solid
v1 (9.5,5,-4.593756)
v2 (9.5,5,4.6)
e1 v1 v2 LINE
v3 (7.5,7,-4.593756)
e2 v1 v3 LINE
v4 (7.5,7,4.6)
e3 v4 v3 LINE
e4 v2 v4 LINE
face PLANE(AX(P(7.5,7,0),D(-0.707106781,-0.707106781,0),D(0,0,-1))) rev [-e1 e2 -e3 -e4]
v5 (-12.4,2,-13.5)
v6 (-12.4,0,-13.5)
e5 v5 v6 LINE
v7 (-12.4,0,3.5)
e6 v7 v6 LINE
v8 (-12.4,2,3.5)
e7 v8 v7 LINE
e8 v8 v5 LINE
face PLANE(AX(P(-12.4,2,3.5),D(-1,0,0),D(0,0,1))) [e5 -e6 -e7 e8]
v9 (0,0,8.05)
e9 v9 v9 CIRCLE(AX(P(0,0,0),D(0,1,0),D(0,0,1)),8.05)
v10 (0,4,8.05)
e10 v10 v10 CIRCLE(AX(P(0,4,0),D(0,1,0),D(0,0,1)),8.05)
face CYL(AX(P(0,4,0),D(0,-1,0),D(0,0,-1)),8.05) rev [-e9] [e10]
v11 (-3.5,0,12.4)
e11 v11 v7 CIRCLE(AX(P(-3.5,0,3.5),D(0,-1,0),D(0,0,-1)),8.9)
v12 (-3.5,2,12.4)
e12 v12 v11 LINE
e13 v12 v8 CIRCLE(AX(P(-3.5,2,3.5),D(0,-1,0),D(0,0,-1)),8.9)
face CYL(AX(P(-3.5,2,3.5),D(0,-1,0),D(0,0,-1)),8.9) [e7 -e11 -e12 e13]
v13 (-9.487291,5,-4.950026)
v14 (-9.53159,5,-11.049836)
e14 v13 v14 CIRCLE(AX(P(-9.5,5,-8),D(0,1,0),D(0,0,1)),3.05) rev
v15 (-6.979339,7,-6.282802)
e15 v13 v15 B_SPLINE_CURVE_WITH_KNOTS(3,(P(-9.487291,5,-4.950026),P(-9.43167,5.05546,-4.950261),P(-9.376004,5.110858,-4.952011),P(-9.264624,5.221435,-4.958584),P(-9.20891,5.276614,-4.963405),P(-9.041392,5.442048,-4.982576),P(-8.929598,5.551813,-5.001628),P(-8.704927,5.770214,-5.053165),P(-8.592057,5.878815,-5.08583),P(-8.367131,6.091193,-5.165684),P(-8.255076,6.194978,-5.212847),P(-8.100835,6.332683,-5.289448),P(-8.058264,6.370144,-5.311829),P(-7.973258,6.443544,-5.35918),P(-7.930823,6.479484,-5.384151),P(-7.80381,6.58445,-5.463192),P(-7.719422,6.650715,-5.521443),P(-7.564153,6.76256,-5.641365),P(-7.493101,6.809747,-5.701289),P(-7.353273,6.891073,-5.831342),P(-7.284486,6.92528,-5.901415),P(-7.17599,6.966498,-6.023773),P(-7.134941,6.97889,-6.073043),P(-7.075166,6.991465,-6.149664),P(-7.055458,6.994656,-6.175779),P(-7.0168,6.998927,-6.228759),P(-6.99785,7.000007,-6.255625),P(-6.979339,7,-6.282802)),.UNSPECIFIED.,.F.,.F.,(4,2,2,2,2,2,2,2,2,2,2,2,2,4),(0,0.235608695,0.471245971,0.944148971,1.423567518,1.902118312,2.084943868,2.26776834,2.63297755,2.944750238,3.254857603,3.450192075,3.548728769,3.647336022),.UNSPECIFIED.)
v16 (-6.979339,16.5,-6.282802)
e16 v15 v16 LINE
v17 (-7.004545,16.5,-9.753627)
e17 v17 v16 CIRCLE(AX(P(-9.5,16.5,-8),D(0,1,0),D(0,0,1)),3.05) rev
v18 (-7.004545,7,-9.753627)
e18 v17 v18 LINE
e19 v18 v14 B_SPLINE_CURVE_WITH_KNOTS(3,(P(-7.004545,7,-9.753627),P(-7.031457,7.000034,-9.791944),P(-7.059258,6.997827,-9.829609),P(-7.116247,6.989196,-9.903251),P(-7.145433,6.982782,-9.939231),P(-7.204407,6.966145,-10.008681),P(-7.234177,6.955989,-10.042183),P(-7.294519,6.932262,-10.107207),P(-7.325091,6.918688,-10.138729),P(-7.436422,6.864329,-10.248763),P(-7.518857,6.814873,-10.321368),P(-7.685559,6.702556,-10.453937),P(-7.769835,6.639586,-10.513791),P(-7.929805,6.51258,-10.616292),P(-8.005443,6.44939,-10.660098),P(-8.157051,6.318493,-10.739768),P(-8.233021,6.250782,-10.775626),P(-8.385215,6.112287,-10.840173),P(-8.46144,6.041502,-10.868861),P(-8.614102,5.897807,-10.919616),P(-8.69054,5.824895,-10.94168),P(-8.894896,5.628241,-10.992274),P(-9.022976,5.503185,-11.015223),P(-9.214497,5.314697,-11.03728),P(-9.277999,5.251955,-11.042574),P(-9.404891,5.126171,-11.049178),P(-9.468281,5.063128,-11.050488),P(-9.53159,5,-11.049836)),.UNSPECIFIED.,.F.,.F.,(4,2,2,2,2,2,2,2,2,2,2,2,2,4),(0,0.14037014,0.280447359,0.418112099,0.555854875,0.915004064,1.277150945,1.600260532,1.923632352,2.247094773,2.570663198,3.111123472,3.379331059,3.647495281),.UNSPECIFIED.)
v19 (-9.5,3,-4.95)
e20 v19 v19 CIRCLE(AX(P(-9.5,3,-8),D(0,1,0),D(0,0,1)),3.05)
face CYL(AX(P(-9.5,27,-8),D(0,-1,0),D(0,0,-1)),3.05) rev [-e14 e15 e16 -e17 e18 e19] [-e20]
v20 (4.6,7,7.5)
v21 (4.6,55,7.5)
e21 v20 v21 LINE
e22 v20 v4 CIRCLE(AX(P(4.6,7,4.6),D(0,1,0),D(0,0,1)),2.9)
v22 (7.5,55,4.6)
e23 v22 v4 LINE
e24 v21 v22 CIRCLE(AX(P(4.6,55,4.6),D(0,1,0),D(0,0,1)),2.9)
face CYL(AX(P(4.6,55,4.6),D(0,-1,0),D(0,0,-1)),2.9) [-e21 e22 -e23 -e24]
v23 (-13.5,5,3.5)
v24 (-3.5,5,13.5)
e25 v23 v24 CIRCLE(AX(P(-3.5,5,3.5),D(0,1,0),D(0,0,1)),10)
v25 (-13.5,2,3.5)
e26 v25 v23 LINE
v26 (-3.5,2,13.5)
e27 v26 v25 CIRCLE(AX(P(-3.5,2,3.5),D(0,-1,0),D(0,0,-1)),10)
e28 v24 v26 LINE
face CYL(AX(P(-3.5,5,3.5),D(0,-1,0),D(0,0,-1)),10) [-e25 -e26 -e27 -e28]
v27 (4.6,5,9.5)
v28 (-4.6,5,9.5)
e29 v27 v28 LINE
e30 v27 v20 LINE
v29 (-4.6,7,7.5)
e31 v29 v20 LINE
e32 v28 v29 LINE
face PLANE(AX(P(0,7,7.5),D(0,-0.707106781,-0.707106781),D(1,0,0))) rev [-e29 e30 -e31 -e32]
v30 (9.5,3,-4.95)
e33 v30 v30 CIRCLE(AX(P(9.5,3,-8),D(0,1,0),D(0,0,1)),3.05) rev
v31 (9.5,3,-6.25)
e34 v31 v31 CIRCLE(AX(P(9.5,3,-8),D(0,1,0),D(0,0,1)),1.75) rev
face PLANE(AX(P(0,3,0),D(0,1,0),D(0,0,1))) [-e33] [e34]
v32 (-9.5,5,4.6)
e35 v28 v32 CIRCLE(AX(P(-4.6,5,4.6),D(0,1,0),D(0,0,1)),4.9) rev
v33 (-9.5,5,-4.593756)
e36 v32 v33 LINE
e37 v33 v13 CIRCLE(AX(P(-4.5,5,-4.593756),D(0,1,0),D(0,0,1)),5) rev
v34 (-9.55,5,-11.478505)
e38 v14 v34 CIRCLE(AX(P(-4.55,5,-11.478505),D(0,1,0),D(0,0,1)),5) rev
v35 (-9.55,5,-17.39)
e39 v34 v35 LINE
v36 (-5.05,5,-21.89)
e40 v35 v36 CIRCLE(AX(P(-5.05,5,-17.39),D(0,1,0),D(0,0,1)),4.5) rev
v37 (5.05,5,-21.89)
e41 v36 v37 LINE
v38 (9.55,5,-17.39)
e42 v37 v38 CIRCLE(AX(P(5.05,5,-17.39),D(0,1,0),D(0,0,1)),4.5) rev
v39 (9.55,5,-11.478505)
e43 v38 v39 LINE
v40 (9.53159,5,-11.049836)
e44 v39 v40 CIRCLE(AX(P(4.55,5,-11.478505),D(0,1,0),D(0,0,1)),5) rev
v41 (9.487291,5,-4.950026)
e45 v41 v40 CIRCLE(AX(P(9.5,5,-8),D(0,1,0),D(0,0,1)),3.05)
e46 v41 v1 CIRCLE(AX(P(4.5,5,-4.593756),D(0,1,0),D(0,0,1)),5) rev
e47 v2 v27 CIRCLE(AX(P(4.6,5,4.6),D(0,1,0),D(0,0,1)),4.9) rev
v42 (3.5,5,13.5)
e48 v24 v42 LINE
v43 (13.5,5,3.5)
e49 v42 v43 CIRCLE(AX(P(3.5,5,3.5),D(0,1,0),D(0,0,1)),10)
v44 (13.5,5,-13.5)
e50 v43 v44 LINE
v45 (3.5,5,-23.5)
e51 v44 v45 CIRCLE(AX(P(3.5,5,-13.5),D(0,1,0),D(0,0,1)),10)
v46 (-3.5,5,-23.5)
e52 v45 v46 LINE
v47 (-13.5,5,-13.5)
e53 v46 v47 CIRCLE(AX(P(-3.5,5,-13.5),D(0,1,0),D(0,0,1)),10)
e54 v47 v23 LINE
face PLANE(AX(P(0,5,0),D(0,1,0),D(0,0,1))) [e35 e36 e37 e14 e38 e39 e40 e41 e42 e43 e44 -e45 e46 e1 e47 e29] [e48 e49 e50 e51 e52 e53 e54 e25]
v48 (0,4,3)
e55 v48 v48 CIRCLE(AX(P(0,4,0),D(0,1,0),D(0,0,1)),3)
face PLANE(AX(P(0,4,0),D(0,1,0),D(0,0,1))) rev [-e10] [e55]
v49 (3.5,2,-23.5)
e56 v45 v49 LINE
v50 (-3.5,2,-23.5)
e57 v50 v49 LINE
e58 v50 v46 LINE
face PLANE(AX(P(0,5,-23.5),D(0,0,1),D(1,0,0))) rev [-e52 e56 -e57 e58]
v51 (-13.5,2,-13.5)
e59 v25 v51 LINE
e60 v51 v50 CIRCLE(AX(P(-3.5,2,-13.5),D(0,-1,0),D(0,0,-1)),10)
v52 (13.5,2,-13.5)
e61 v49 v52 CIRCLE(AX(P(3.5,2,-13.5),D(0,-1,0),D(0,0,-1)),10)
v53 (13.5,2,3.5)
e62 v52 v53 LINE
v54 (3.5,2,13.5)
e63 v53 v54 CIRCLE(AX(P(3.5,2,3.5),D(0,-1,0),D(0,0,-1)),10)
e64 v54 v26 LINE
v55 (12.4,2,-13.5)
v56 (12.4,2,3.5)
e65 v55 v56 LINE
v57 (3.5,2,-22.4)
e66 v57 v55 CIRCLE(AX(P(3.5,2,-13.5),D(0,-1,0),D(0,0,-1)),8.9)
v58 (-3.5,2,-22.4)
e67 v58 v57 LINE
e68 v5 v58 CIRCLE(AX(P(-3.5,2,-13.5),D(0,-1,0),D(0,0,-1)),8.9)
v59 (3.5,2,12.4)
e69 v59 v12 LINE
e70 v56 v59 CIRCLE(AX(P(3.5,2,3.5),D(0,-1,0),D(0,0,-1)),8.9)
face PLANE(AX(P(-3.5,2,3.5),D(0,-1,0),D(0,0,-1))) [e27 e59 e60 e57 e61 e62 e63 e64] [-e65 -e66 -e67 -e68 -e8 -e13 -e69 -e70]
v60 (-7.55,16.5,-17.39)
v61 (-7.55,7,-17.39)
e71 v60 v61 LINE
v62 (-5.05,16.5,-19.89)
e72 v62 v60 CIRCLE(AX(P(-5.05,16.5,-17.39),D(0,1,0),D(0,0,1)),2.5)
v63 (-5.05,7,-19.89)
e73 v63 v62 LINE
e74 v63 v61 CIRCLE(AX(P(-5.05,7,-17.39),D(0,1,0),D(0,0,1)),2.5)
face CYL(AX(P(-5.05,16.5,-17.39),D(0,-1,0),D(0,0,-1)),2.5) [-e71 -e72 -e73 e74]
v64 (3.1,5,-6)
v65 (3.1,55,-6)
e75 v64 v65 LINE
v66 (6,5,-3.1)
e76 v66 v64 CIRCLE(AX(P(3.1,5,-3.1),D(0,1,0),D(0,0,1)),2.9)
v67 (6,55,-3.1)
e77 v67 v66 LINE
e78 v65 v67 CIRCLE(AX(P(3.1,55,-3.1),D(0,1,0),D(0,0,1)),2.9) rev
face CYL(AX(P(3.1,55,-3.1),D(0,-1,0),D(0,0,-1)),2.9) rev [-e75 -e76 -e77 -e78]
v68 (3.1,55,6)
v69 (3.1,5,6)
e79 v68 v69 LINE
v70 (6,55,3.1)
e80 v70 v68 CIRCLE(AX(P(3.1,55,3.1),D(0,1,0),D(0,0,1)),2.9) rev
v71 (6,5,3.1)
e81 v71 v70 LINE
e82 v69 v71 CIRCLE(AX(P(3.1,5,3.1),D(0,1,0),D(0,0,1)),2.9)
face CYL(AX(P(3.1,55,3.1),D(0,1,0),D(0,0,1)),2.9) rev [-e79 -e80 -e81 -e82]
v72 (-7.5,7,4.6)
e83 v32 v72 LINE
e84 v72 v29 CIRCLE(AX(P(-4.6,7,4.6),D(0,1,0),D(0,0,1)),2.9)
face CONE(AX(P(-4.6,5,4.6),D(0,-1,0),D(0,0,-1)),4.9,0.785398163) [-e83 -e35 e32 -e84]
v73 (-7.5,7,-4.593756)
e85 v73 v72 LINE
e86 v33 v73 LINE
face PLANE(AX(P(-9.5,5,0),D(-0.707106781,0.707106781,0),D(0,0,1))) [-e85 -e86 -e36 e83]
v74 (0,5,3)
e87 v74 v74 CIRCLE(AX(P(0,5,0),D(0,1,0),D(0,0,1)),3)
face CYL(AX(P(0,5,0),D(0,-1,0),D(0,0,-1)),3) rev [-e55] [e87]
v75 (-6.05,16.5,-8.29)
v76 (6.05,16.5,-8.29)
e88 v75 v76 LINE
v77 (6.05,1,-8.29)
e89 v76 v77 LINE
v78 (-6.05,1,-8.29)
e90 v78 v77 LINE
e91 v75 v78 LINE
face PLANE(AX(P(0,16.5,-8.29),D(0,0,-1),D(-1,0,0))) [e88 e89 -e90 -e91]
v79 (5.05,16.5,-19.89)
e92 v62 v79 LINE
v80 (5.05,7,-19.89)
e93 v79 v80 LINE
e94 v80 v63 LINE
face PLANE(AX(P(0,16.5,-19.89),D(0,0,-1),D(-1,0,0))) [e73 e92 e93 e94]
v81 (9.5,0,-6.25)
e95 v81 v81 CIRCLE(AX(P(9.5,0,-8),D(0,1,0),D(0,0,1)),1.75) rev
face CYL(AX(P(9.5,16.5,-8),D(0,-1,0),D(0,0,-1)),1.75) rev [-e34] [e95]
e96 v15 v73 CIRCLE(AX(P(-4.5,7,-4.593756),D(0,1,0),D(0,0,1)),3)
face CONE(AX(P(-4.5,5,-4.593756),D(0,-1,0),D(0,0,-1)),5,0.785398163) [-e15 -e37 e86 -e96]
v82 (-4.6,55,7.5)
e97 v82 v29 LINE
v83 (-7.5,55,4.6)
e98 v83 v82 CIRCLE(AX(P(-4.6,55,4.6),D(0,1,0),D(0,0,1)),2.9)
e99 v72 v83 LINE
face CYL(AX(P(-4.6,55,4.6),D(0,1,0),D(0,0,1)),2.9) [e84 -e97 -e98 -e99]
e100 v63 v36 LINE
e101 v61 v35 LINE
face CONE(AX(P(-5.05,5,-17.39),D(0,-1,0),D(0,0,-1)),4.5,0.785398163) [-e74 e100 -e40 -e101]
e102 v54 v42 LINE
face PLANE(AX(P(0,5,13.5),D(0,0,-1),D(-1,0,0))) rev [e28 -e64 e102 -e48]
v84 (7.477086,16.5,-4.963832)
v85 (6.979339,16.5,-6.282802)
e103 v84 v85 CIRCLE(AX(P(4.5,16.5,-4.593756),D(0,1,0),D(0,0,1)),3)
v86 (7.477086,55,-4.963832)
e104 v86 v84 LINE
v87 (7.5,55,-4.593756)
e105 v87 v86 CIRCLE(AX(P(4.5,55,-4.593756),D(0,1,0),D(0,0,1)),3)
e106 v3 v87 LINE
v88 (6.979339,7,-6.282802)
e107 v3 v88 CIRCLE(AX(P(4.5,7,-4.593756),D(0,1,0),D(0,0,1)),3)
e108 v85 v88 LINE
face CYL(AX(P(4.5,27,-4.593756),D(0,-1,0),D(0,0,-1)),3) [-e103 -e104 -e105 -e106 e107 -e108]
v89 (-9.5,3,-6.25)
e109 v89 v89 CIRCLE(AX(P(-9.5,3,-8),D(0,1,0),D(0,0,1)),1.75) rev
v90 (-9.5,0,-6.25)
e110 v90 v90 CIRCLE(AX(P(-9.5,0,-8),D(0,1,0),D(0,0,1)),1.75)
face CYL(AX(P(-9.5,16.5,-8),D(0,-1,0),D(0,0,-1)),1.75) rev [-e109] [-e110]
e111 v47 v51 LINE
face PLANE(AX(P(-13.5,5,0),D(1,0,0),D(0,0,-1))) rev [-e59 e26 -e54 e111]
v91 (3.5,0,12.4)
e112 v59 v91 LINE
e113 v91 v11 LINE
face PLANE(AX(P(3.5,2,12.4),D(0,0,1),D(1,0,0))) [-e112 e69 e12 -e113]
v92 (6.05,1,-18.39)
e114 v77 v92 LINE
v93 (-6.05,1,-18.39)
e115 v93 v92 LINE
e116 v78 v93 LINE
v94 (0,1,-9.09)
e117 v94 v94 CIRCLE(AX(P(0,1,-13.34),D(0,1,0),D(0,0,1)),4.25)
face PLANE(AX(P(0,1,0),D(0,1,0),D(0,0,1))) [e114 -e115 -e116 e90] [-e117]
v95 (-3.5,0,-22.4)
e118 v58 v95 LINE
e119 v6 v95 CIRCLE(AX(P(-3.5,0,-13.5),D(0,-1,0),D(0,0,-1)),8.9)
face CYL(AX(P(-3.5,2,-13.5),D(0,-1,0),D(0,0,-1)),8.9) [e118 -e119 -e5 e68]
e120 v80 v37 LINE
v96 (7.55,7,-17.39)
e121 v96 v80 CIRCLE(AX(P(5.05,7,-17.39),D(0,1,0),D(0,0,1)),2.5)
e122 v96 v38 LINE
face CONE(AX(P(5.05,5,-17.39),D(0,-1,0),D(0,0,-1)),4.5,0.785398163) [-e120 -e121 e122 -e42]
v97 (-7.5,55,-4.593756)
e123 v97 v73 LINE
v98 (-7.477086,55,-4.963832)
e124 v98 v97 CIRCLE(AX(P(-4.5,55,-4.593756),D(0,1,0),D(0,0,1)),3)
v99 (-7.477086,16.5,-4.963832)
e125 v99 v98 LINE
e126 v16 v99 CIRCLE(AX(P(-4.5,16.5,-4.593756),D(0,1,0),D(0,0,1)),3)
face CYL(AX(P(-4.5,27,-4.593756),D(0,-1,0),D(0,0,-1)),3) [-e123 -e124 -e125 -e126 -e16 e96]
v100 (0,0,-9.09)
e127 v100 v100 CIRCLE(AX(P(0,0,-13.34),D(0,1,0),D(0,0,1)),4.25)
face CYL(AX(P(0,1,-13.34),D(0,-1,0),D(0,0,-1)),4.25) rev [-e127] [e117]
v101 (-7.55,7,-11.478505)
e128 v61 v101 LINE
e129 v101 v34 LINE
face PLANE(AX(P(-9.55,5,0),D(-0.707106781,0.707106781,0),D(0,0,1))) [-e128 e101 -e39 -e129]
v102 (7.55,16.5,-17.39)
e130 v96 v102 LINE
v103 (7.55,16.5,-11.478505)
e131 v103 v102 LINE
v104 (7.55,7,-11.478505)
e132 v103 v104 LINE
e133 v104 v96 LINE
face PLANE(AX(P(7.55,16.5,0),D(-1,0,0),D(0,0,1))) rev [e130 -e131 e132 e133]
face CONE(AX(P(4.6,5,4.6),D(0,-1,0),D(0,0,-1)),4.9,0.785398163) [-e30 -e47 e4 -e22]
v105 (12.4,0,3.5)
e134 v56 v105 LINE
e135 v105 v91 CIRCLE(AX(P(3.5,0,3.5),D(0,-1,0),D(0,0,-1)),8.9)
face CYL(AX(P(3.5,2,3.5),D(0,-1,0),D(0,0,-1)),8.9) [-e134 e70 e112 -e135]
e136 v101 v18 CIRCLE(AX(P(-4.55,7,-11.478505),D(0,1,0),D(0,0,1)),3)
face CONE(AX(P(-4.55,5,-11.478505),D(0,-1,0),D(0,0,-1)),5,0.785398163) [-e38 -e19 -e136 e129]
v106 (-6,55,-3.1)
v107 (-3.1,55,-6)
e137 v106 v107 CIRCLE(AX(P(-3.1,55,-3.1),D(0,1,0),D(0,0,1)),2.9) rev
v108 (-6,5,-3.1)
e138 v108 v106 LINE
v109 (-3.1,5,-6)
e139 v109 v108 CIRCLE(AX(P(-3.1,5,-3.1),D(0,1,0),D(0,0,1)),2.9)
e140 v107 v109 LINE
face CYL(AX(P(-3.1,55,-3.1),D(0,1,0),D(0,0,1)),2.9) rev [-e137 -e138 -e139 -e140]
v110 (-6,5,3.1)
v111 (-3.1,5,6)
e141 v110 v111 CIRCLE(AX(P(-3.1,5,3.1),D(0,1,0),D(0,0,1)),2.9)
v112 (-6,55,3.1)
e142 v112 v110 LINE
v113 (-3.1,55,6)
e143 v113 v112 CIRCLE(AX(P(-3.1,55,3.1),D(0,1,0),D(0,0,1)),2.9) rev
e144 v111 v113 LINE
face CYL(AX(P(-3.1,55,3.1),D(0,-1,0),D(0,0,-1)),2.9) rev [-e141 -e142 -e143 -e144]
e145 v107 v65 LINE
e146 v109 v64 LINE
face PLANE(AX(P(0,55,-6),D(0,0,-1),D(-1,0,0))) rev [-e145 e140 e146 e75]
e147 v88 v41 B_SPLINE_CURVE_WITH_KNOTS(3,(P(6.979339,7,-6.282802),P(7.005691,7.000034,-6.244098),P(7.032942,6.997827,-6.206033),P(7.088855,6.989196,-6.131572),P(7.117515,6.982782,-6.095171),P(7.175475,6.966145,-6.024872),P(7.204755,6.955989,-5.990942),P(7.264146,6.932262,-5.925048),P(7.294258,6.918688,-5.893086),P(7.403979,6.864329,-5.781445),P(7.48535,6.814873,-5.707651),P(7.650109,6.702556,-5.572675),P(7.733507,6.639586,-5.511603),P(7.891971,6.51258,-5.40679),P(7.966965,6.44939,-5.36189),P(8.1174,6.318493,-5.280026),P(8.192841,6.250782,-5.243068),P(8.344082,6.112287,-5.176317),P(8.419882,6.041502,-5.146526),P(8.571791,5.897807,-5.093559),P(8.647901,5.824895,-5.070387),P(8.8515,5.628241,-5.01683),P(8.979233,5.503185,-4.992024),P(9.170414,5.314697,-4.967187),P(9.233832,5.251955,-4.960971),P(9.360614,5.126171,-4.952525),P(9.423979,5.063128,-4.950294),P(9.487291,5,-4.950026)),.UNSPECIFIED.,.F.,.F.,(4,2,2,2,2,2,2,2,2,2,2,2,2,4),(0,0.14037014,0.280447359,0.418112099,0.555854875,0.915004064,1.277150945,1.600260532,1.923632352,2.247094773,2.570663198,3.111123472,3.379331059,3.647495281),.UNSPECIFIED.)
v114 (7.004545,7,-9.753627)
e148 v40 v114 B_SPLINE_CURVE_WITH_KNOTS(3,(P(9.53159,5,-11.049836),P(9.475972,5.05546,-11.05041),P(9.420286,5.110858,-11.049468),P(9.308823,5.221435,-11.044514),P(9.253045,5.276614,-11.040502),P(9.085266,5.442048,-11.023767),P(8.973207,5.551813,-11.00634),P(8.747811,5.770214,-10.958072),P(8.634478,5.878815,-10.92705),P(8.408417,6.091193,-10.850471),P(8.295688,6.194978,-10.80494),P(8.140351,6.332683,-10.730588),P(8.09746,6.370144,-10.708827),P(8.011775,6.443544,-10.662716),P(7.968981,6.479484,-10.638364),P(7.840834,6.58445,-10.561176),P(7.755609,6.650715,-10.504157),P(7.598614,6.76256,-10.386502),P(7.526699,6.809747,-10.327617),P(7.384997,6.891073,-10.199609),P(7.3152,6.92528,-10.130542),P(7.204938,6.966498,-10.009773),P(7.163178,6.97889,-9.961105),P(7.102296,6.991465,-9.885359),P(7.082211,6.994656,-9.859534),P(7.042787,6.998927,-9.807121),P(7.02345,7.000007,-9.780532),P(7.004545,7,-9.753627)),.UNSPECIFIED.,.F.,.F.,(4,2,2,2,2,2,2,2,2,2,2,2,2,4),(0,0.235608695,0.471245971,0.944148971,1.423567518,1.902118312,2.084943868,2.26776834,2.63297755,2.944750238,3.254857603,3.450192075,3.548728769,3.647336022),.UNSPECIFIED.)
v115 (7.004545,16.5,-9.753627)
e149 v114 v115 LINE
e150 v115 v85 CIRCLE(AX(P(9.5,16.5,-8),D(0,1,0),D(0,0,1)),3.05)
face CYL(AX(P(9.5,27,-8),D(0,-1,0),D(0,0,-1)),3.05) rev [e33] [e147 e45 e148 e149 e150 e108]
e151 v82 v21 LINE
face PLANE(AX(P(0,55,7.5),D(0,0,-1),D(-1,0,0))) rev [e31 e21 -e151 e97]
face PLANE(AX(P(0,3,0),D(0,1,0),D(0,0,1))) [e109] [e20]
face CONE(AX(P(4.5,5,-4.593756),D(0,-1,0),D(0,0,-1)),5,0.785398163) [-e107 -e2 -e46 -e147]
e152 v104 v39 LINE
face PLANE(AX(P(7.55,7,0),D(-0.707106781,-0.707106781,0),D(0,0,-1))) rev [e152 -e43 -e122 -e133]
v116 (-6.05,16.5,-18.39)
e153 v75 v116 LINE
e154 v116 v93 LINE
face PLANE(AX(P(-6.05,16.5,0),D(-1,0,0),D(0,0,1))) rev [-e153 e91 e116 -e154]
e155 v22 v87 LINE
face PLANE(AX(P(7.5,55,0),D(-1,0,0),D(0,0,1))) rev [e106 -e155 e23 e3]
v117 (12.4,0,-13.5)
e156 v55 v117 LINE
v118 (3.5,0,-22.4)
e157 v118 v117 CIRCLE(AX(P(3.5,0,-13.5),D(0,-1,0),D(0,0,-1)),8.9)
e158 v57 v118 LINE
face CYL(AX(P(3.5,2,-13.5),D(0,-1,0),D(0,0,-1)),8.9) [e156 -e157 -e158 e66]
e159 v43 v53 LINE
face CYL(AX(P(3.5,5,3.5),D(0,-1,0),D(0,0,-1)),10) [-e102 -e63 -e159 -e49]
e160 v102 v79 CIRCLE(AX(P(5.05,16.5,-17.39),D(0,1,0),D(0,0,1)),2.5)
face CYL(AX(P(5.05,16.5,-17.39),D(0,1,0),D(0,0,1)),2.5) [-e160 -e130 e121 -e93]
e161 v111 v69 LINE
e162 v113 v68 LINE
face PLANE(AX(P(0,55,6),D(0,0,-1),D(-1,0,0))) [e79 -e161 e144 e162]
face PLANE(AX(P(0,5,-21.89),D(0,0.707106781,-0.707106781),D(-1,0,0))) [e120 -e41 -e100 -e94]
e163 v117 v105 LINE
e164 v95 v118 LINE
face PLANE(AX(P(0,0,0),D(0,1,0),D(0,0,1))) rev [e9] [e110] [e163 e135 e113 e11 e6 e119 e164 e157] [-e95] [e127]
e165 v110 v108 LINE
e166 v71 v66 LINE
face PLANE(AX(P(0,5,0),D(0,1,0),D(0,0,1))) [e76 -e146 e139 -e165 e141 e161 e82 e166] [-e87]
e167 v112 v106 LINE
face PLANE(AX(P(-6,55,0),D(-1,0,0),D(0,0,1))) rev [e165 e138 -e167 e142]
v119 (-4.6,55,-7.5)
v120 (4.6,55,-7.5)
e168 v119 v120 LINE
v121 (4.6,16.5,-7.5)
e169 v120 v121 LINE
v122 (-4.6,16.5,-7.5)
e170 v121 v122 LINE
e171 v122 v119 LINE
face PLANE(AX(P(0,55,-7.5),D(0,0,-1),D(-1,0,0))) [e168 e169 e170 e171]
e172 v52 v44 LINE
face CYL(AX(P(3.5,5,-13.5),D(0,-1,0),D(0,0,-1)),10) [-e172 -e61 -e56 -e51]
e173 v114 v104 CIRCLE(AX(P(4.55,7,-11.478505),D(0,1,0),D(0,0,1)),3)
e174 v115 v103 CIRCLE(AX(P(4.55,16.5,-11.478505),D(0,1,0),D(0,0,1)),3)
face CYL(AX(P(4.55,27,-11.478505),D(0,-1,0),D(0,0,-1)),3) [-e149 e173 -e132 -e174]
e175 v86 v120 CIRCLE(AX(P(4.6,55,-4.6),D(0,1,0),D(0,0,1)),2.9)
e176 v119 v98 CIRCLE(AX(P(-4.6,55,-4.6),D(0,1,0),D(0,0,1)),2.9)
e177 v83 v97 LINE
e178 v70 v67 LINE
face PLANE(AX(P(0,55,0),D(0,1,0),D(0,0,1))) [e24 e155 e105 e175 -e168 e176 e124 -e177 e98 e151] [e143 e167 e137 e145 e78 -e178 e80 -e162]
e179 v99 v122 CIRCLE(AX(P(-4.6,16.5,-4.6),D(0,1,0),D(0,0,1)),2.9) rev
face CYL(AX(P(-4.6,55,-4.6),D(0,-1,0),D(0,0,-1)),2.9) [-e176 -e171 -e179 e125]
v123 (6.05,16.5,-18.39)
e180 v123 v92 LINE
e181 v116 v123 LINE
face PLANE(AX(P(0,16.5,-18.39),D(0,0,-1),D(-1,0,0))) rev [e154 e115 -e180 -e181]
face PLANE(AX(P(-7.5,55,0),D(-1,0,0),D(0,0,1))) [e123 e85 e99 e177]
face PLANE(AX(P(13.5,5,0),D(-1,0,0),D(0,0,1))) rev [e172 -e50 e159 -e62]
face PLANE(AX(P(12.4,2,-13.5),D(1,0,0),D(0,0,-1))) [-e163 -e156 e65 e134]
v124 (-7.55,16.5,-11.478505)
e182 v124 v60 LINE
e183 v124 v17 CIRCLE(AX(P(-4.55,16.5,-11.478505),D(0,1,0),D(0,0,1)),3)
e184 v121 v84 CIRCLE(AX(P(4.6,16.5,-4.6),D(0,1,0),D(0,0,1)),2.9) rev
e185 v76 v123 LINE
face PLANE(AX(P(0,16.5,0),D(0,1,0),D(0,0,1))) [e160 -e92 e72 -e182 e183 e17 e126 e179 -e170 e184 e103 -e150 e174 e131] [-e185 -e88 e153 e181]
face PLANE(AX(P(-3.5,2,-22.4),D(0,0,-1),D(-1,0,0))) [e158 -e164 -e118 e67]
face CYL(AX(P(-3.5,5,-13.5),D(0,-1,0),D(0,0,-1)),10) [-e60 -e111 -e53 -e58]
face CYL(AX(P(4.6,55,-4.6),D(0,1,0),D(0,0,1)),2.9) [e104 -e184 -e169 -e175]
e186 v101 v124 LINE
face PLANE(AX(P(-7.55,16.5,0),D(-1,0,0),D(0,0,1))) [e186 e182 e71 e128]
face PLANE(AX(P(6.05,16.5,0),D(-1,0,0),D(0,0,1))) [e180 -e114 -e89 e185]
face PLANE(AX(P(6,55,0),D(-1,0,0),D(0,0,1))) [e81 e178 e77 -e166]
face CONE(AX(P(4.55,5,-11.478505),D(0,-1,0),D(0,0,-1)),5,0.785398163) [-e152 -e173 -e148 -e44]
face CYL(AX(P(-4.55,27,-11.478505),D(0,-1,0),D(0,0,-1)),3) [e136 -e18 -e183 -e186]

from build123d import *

# Parameters (mm, degrees)
SKETCH2_W               = 27
SKETCH2_H               = 37
SKETCH2_R               = 3
SKETCH2_W_2             = 15.1
SKETCH2_H_2             = 13.1
BOSS_EXTRUDE1_DEPTH     = 5
SKETCH2_7_W             = 15.1
SKETCH2_7_H             = 13.1
SKETCH2_7_W_2           = 12.1
SKETCH2_7_H_2           = 10.1
BOSS_EXTRUDE2_DEPTH     = 16.5
SKETCH2_8_W             = 12.1
SKETCH2_8_H             = 10.1
SKETCH2_8_R             = 4.25
BOSS_EXTRUDE3_DEPTH     = 1
SKETCH2_12_R            = 8.05
CUT_EXTRUDE3_DEPTH      = 4
SKETCH2_11_R            = 1.75
CUT_EXTRUDE2_DEPTH      = 32.729323976
FILLET1_R               = 10
CUT_EXTRUDE1_START      = -2
CUT_EXTRUDE1_DEPTH      = 2
SKETCH4_W               = 15
SKETCH4_H               = 15
SKETCH4_W_2             = 12
SKETCH4_H_2             = 12
BOSS_EXTRUDE8_DEPTH     = 50
FILLET4_R               = 2.5
CUT_EXTRUDE4_DEPTH      = 22
CUT_EXTRUDE4_DEPTH_BACK = 2
SKETCH4_3_R             = 1.75
FILLET3_START           = 16.5
FILLET3_DEPTH           = 38.5
FILLET3_START_2         = 5
FILLET3_2_DEPTH         = 11.898030769
FILLET5_R               = 3
CHAMFER1_SIZE           = 2
FILLET6_R               = 2.9


with BuildPart() as part:
    # Sketch2 → Boss-Extrude1 (new body)
    with BuildSketch(Plane(origin=(0, 0, 0), x_dir=(1, 0, 0), z_dir=(0, 1, 0))):
        with Locations((0, 5)):
            Rectangle(SKETCH2_W, SKETCH2_H)
        with Locations(Location((0, 0, 0), (0, 0, 270))):
            Circle(SKETCH2_R, mode=Mode.SUBTRACT)
        with Locations((0, 13.34)):
            Rectangle(SKETCH2_W_2, SKETCH2_H_2, mode=Mode.SUBTRACT)
    extrude(amount=BOSS_EXTRUDE1_DEPTH)

    # Sketch2<7> → Boss-Extrude2 (add)
    with BuildSketch(Plane(origin=(0, 0, 0), x_dir=(1, 0, 0), z_dir=(0, 1, 0))):
        with Locations((0, 13.34)):
            Rectangle(SKETCH2_7_W, SKETCH2_7_H)
        with Locations((0, 13.34)):
            Rectangle(SKETCH2_7_W_2, SKETCH2_7_H_2, mode=Mode.SUBTRACT)
    extrude(amount=BOSS_EXTRUDE2_DEPTH)

    # Sketch2<8> → Boss-Extrude3 (add)
    with BuildSketch(Plane(origin=(0, 0, 0), x_dir=(1, 0, 0), z_dir=(0, 1, 0))):
        with Locations((0, 13.34)):
            Rectangle(SKETCH2_8_W, SKETCH2_8_H)
        with Locations(Location((0, 13.34, 0), (0, 0, 270))):
            Circle(SKETCH2_8_R, mode=Mode.SUBTRACT)
    extrude(amount=BOSS_EXTRUDE3_DEPTH)

    # Sketch2<12> → Cut-Extrude3 (cut)
    with BuildSketch(Plane(origin=(0, 0, 0), x_dir=(1, 0, 0), z_dir=(0, 1, 0))):
        with Locations(Location((0, 0, 0), (0, 0, 270))):
            Circle(SKETCH2_12_R)
    extrude(amount=CUT_EXTRUDE3_DEPTH, mode=Mode.SUBTRACT)

    # Sketch2<11> → Cut-Extrude2 (cut, through all)
    with BuildSketch(Plane(origin=(0, 0, 0), x_dir=(1, 0, 0), z_dir=(0, 1, 0))):
        with Locations(Location((-9.5, 8, 0), (0, 0, 270))):
            Circle(SKETCH2_11_R)
        with Locations(Location((9.5, 8, 0), (0, 0, 270))):
            Circle(SKETCH2_11_R)
    extrude(amount=CUT_EXTRUDE2_DEPTH, mode=Mode.SUBTRACT)

    # Fillet1
    fillet1_edges = [part.edges().sort_by_distance(p)[0] for p in [
        (-13.5, 2.5, -23.5),
        (13.5, 2.5, -23.5),
        (13.5, 2.5, 13.5),
        (-13.5, 2.5, 13.5),
    ]]
    fillet(fillet1_edges, radius=FILLET1_R)

    # Sketch3 → Cut-Extrude1 (cut)
    with BuildSketch(Plane.XZ.offset(CUT_EXTRUDE1_START)):
        with BuildLine():
            Line((-13.5, 3.5), (-13.5, -13.5))
            ThreePointArc((-13.5, -13.5), (-10.571067812, -20.571067812), (-3.5, -23.5))
            Line((-3.5, -23.5), (3.5, -23.5))
            ThreePointArc((3.5, -23.5), (10.571067812, -20.571067812), (13.5, -13.5))
            Line((13.5, -13.5), (13.5, 3.5))
            ThreePointArc((13.5, 3.5), (10.571067812, 10.571067812), (3.5, 13.5))
            Line((3.5, 13.5), (-3.5, 13.5))
            ThreePointArc((-3.5, 13.5), (-10.571067812, 10.571067812), (-13.5, 3.5))
        make_face()
        with BuildLine():
            Line((-12.4, 3.5), (-12.4, -13.5))
            ThreePointArc((-12.4, -13.5), (-9.793250353, -19.793250353), (-3.5, -22.4))
            Line((-3.5, -22.4), (3.5, -22.4))
            ThreePointArc((3.5, -22.4), (9.793250353, -19.793250353), (12.4, -13.5))
            Line((12.4, -13.5), (12.4, 3.5))
            ThreePointArc((12.4, 3.5), (9.793250353, 9.793250353), (3.5, 12.4))
            Line((3.5, 12.4), (-3.5, 12.4))
            ThreePointArc((-3.5, 12.4), (-9.793250353, 9.793250353), (-12.4, 3.5))
        make_face(mode=Mode.SUBTRACT)
    extrude(amount=CUT_EXTRUDE1_DEPTH, mode=Mode.SUBTRACT)

    # Sketch4 → Boss-Extrude8 (add)
    with BuildSketch(Plane(origin=(0, 5, 0), x_dir=(1, 0, 0), z_dir=(0, 1, 0))):
        Rectangle(SKETCH4_W, SKETCH4_H)
        Rectangle(SKETCH4_W_2, SKETCH4_H_2, mode=Mode.SUBTRACT)
    extrude(amount=BOSS_EXTRUDE8_DEPTH)

    # Fillet4
    # the kernel refuses this fillet: 2.5 mm, written as the material it takes off along each edge
    with BuildSketch(Plane(origin=(-7.55, 5, -19.89), x_dir=(0, 0, 1), z_dir=(0, 1, 0))) as fillet4_piece_1:
        with BuildLine():
            CenterArc((FILLET4_R, FILLET4_R), FILLET4_R, 180, 90)
            Line((0, FILLET4_R), (0, 0))
            Line((0, 0), (FILLET4_R, 0))
        make_face()
    extrude(amount=17.75, mode=Mode.SUBTRACT)
    with BuildSketch(Plane(origin=(7.55, 5, -19.89), x_dir=(0, 0, 1), z_dir=(0, 1, 0))) as fillet4_piece_2:
        with BuildLine():
            CenterArc((FILLET4_R, -FILLET4_R), FILLET4_R, 90, 90)
            Line((0, -FILLET4_R), (0, 0))
            Line((0, 0), (FILLET4_R, 0))
        make_face()
    extrude(amount=17.75, mode=Mode.SUBTRACT)
    with BuildSketch(Plane(origin=(7.55, 5, -6.79), x_dir=(-1, 0, 0), z_dir=(0, 1, 0))) as fillet4_piece_3:
        with BuildLine():
            CenterArc((2.5, -0.497493719), FILLET4_R, 168.521659045, 11.478340955)
            Line((0, -0.497493719), (0, 0))
            Line((0, 0), (0.05, 0))
        make_face()
    extrude(amount=12.743734296, mode=Mode.SUBTRACT)
    with BuildSketch(Plane(origin=(-7.55, 5, -6.79), x_dir=(0, 0, -1), z_dir=(0, 1, 0))) as fillet4_piece_4:
        with BuildLine():
            CenterArc((0.497493719, -2.5), FILLET4_R, 90, 11.478340955)
            Line((0, -0.05), (0, 0))
            Line((0, 0), (0.497493719, 0))
        make_face()
    extrude(amount=12.743734296, mode=Mode.SUBTRACT)

    # Sketch4<3> → Cut-Extrude4 (cut, two sides: drawn at the far end of the back side and taken through both)
    # profile 1 of 8: a face of its own
    with BuildSketch(Plane(origin=(0, 5, 0), x_dir=(1, 0, 0), z_dir=(0, 1, 0)).offset(-CUT_EXTRUDE4_DEPTH_BACK)):
        with BuildLine():
            Line((7.5, 6.79), (7.5, 5.697284212))
            ThreePointArc((7.5, 5.697284212), (10.765405073, 5.22488739), (12.55, 8))
            ThreePointArc((12.55, 8), (10.795183385, 10.761340254), (7.55, 10.34520788))
            Line((7.55, 10.34520788), (7.55, 6.79))
            Line((7.55, 6.79), (7.5, 6.79))
        make_face()
        with Locations(Location((9.5, 8, 0), (0, 0, 270))):
            Circle(SKETCH4_3_R, mode=Mode.SUBTRACT)
    # profile 2 of 8: a face of its own
    with BuildSketch(Plane(origin=(0, 5, 0), x_dir=(1, 0, 0), z_dir=(0, 1, 0)).offset(-CUT_EXTRUDE4_DEPTH_BACK)):
        with BuildLine():
            Line((7.5, 7.5), (7.5, 6.79))
            Line((7.5, 6.79), (7.55, 6.79))
            Line((7.55, 6.79), (7.55, 10.34520788))
            ThreePointArc((7.55, 10.34520788), (6.641491505, 9.063686601), (6.491262723, 7.5))
            Line((6.491262723, 7.5), (7.5, 7.5))
        make_face()
    # profile 3 of 8: a face of its own
    with BuildSketch(Plane(origin=(0, 5, 0), x_dir=(1, 0, 0), z_dir=(0, 1, 0)).offset(-CUT_EXTRUDE4_DEPTH_BACK)):
        with BuildLine():
            Line((6.700285729, 6.79), (7.5, 6.79))
            Line((7.5, 6.79), (7.5, 7.5))
            Line((7.5, 7.5), (6.491262723, 7.5))
            ThreePointArc((6.491262723, 7.5), (6.57415784, 7.138636166), (6.700285729, 6.79))
        make_face()
    # profile 4 of 8: a face of its own
    with BuildSketch(Plane(origin=(0, 5, 0), x_dir=(1, 0, 0), z_dir=(0, 1, 0)).offset(-CUT_EXTRUDE4_DEPTH_BACK)):
        with BuildLine():
            ThreePointArc((6.700285729, 6.79), (7.038735849, 6.198700808), (7.5, 5.697284212))
            Line((7.5, 5.697284212), (7.5, 6.79))
            Line((7.5, 6.79), (6.700285729, 6.79))
        make_face()
    # profile 5 of 8: a face of its own
    with BuildSketch(Plane(origin=(0, 5, 0), x_dir=(1, 0, 0), z_dir=(0, 1, 0)).offset(-CUT_EXTRUDE4_DEPTH_BACK)):
        with BuildLine():
            Line((-7.55, 6.79), (-7.5, 6.79))
            Line((-7.5, 6.79), (-7.5, 7.5))
            Line((-7.5, 7.5), (-6.491262723, 7.5))
            ThreePointArc((-6.491262723, 7.5), (-6.460333185, 7.749150138), (-6.45, 8))
            ThreePointArc((-6.45, 8), (-6.738659746, 9.295183385), (-7.55, 10.34520788))
            Line((-7.55, 10.34520788), (-7.55, 6.79))
        make_face()
    # profile 6 of 8: a face of its own
    with BuildSketch(Plane(origin=(0, 5, 0), x_dir=(1, 0, 0), z_dir=(0, 1, 0)).offset(-CUT_EXTRUDE4_DEPTH_BACK)):
        with BuildLine():
            Line((-7.5, 6.79), (-6.700285729, 6.79))
            ThreePointArc((-6.700285729, 6.79), (-6.57415784, 7.138636166), (-6.491262723, 7.5))
            Line((-6.491262723, 7.5), (-7.5, 7.5))
            Line((-7.5, 7.5), (-7.5, 6.79))
        make_face()
    # profile 7 of 8: a face of its own
    with BuildSketch(Plane(origin=(0, 5, 0), x_dir=(1, 0, 0), z_dir=(0, 1, 0)).offset(-CUT_EXTRUDE4_DEPTH_BACK)):
        with BuildLine():
            ThreePointArc((-7.55, 10.34520788), (-12.549823537, 7.967191549), (-7.5, 5.697284212))
            Line((-7.5, 5.697284212), (-7.5, 6.79))
            Line((-7.5, 6.79), (-7.55, 6.79))
            Line((-7.55, 6.79), (-7.55, 10.34520788))
        make_face()
        with Locations(Location((-9.5, 8, 0), (0, 0, 270))):
            Circle(SKETCH4_3_R, mode=Mode.SUBTRACT)
    # profile 8 of 8: a face of its own
    with BuildSketch(Plane(origin=(0, 5, 0), x_dir=(1, 0, 0), z_dir=(0, 1, 0)).offset(-CUT_EXTRUDE4_DEPTH_BACK)):
        with BuildLine():
            Line((-7.5, 6.79), (-7.5, 5.697284212))
            ThreePointArc((-7.5, 5.697284212), (-7.038735849, 6.198700808), (-6.700285729, 6.79))
            Line((-6.700285729, 6.79), (-7.5, 6.79))
        make_face()
    extrude(amount=CUT_EXTRUDE4_DEPTH + CUT_EXTRUDE4_DEPTH_BACK, mode=Mode.SUBTRACT)

    # Fillet3: read off the stored shape, not the designer's step
    # Fillet3 outline → Fillet3 (cut)
    with BuildSketch(Plane(origin=(0, 0, 0), x_dir=(1, 0, 0), z_dir=(0, 1, 0)).offset(FILLET3_START)):
        with BuildLine():
            Line((7.5, -7.5), (7.5, -4.6))
            ThreePointArc((7.5, -4.6), (6.650609665, -6.650609665), (4.6, -7.5))
            Line((4.6, -7.5), (7.5, -7.5))
        make_face()
        with BuildLine():
            ThreePointArc((4.6, 7.5), (6.650609665, 6.650609665), (7.5, 4.6))
            Line((7.5, 4.6), (7.5, 7.5))
            Line((7.5, 7.5), (4.6, 7.5))
        make_face()
        with BuildLine():
            Line((-7.5, -7.5), (-4.6, -7.5))
            ThreePointArc((-4.6, -7.5), (-6.650609665, -6.650609665), (-7.5, -4.6))
            Line((-7.5, -4.6), (-7.5, -7.5))
        make_face()
        with BuildLine():
            ThreePointArc((-7.5, 4.6), (-6.650609665, 6.650609665), (-4.6, 7.5))
            Line((-4.6, 7.5), (-7.5, 7.5))
            Line((-7.5, 7.5), (-7.5, 4.6))
        make_face()
    extrude(amount=FILLET3_DEPTH, mode=Mode.SUBTRACT)

    # Fillet3 2 outline → Fillet3 2 (cut)
    with BuildSketch(Plane(origin=(0, 0, 0), x_dir=(1, 0, 0), z_dir=(0, 1, 0)).offset(FILLET3_START_2)):
        with BuildLine():
            Line((7.5, -7.5), (7.5, -4.6))
            ThreePointArc((7.5, -4.6), (6.650609665, -6.650609665), (4.6, -7.5))
            Line((4.6, -7.5), (7.5, -7.5))
        make_face()
        with BuildLine():
            Line((-7.5, -7.5), (-4.6, -7.5))
            ThreePointArc((-4.6, -7.5), (-6.650609665, -6.650609665), (-7.5, -4.6))
            Line((-7.5, -4.6), (-7.5, -7.5))
        make_face()
    extrude(amount=FILLET3_2_DEPTH, mode=Mode.SUBTRACT)

    # Fillet5
    # the kernel refuses this fillet: 3 mm, written as the material it takes off along each edge
    with BuildSketch(Plane(origin=(-7.55, 19.333243866, -10.34520788), x_dir=(0.6778637103057632, 0, 0.7351875884769167), z_dir=(0, -1, 0))) as fillet5_piece_1:
        with BuildLine():
            CenterArc((1.200404841, -2.973784045), FILLET5_R, 97.58012931, 35.096801228)
            Line((-0.83318629, -0.76822128), (0, 0))
            ThreePointArc((0, 0), (0.402333491, -0.026652888), (0.804666981, 0))
        make_face()
    extrude(amount=14.333243866, mode=Mode.SUBTRACT)
    with BuildSketch(Plane(origin=(-7.5, 5, -5.697284212), x_dir=(0.6645067572488152, 0, -0.7472822556241144), z_dir=(0, 1, 0))) as fillet5_piece_2:
        with BuildLine():
            CenterArc((1.168873021, -2.975148897), FILLET5_R, 97.379893382, 34.264602894)
            Line((-0.82464725, -0.733302131), (0, 0))
            ThreePointArc((0, 0), (0.391765134, -0.025265288), (0.783530267, 0))
        make_face()
    extrude(amount=14.258821195, mode=Mode.SUBTRACT)
    with BuildSketch(Plane(origin=(7.55, 19.333243866, -10.34520788), x_dir=(0, 0, -1), z_dir=(0, -1, 0))) as fillet5_piece_3:
        with BuildLine():
            CenterArc((1.133297546, -3), FILLET5_R, 90, 35.096801228)
            ThreePointArc((-0.591581177, -0.545454545), (-0.277723563, -0.292322145), (0, 0))
            Line((0, 0), (1.133297546, 0))
        make_face()
    extrude(amount=14.333243866, mode=Mode.SUBTRACT)
    with BuildSketch(Plane(origin=(7.5, 19.258821195, -5.697284212), x_dir=(0, 0, 1), z_dir=(0, -1, 0))) as fillet5_piece_4:
        with BuildLine():
            CenterArc((1.103528478, 3), FILLET5_R, 235.735397106, 34.264602894)
            ThreePointArc((-0.585518265, 0.520661157), (-0.275970178, 0.27921088), (0, 0))
            Line((0, 0), (1.103528478, 0))
        make_face()
    extrude(amount=14.258821195, mode=Mode.SUBTRACT)

    # Chamfer1
    # the kernel refuses this chamfer: 2 mm, written as the material it adds along each edge
    with BuildSketch(Plane(origin=(-5.05, 5, -19.89), x_dir=(0, 0, -1), z_dir=(1, 0, 0))) as chamfer1_piece_1:
        Polygon((CHAMFER1_SIZE, 0), (0, CHAMFER1_SIZE), (0, 0), align=None)
    extrude(amount=10.1)
    with BuildSketch(Plane(origin=(-5.05, 5, -17.39), x_dir=(0, 0, -1), z_dir=(1, 0, 0))) as chamfer1_piece_2:
        Polygon((2.5 + CHAMFER1_SIZE, 0), (2.5, CHAMFER1_SIZE), (2.5, 0), align=None)
    revolve(axis=Axis((-5.05, 5, -17.39), (0, 1, 0)), revolution_arc=90)
    with BuildSketch(Plane(origin=(5.05, 5, -17.39), x_dir=(1, 0, 0), z_dir=(0, 0, 1))) as chamfer1_piece_3:
        Polygon((2.5 + CHAMFER1_SIZE, 0), (2.5, CHAMFER1_SIZE), (2.5, 0), align=None)
    revolve(axis=Axis((5.05, 5, -17.39), (0, 1, 0)), revolution_arc=90)
    with BuildSketch(Plane(origin=(7.5, 5, 4.6), x_dir=(1, 0, 0), z_dir=(0, 0, -1)), Plane(origin=(-7.5, 5, -4.593755734), x_dir=(-1, 0, 0), z_dir=(0, 0, 1))) as chamfer1_piece_4:
        Polygon((CHAMFER1_SIZE, 0), (0, -CHAMFER1_SIZE), (0, 0), align=None)
    extrude(amount=9.193755734)
    with BuildSketch(Plane(origin=(-4.6, 5, 7.5), x_dir=(0, 0, 1), z_dir=(1, 0, 0))) as chamfer1_piece_5:
        Polygon((CHAMFER1_SIZE, 0), (0, -CHAMFER1_SIZE), (0, 0), align=None)
    extrude(amount=9.2)
    with BuildSketch(Plane(origin=(4.599999998, 5, 4.599999998), x_dir=(1.0, 0, 5.191813260135323e-10), z_dir=(5.191813260135323e-10, 0, -1.0))) as chamfer1_piece_6:
        Polygon((2.900000002 + CHAMFER1_SIZE, 0), (2.900000002, -CHAMFER1_SIZE), (2.900000002, 0), align=None)
    revolve(axis=Axis((4.599999998, 5, 4.599999998), (0, -1, 0)), revolution_arc=89.999999941)
    with BuildSketch(Plane(origin=(-4.599999998, 5, 4.599999998), x_dir=(-5.191813260135323e-10, 0, 1.0), z_dir=(1.0, 0, 5.191813260135323e-10))) as chamfer1_piece_7:
        Polygon((2.900000002 + CHAMFER1_SIZE, 0), (2.900000002, -CHAMFER1_SIZE), (2.900000002, 0), align=None)
    revolve(axis=Axis((-4.599999998, 5, 4.599999998), (0, -1, 0)), revolution_arc=89.999999941)
    with BuildSketch(Plane(origin=(-7.55, 5, -11.478505426), x_dir=(-1, 0, 0), z_dir=(0, 0, -1)), Plane(origin=(7.55, 5, -17.39), x_dir=(1, 0, 0), z_dir=(0, 0, 1))) as chamfer1_piece_8:
        Polygon((CHAMFER1_SIZE, 0), (0, CHAMFER1_SIZE), (0, 0), align=None)
    extrude(amount=5.911494574)
    with BuildSketch(Plane(origin=(-4.55, 5, -11.478505426), x_dir=(0.6862482592405377, 0, 0.7273673945739744), z_dir=(0.7273673945739744, 0, -0.6862482592405377))) as chamfer1_piece_9_section:
        Polygon((3 + CHAMFER1_SIZE, 0), (3, -CHAMFER1_SIZE), (3, 0), align=None)
    chamfer1_piece_9 = revolve(axis=Axis((-4.55, 5, -11.478505426), (0, -1, 0)), revolution_arc=133.333854906, mode=Mode.PRIVATE)
    chamfer1_piece_9 = chamfer1_piece_9 - Plane(origin=(-9.5, 5, -8), x_dir=(0.9864712382511708, 0, 0.16393442622952004), z_dir=(0, 1, 0)) * Cylinder(3.05, 20, mode=Mode.PRIVATE)
    chamfer1_piece_9 = split(chamfer1_piece_9, bisect_by=Plane(origin=(-6.05, 5, -11.478505426), z_dir=(-1, 0, 0)), keep=Keep.TOP, mode=Mode.PRIVATE)
    add(chamfer1_piece_9)
    with BuildSketch(Plane(origin=(-4.5, 5, -4.593755734), x_dir=(0.6756079062799596, 0, -0.7372611185814761), z_dir=(0.7372611185814761, 0, 0.6756079062799596))) as chamfer1_piece_10_section:
        Polygon((3 + CHAMFER1_SIZE, 0), (3, CHAMFER1_SIZE), (3, 0), align=None)
    chamfer1_piece_10 = revolve(axis=Axis((-4.5, 5, -4.593755734), (0, 1, 0)), revolution_arc=132.501375425, mode=Mode.PRIVATE)
    chamfer1_piece_10 = chamfer1_piece_10 - Plane(origin=(-9.5, 5, -8), x_dir=(0.9864712382511708, 0, 0.16393442622952004), z_dir=(0, 1, 0)) * Cylinder(3.05, 21, mode=Mode.PRIVATE)
    chamfer1_piece_10 = split(chamfer1_piece_10, bisect_by=Plane(origin=(-4.5, 5, -8.29), z_dir=(0, 0, 1)), keep=Keep.TOP, mode=Mode.PRIVATE)
    add(chamfer1_piece_10)
    with BuildSketch(Plane(origin=(4.55, 5, -11.478505426), x_dir=(1, 0, 0), z_dir=(0, 0, -1))) as chamfer1_piece_11_section:
        Polygon((3 + CHAMFER1_SIZE, 0), (3, -CHAMFER1_SIZE), (3, 0), align=None)
    chamfer1_piece_11 = revolve(axis=Axis((4.55, 5, -11.478505426), (0, -1, 0)), revolution_arc=133.333854906, mode=Mode.PRIVATE)
    chamfer1_piece_11 = chamfer1_piece_11 - Plane(origin=(9.5, 5, -8), x_dir=(-0.6557377049180538, 0, 0.7549887829291264), z_dir=(0, 1, 0)) * Cylinder(3.05, 21, mode=Mode.PRIVATE)
    chamfer1_piece_11 = split(chamfer1_piece_11, bisect_by=Plane(origin=(6.05, 5, -11.478505426), z_dir=(1, 0, 0)), keep=Keep.TOP, mode=Mode.PRIVATE)
    add(chamfer1_piece_11)
    with BuildSketch(Plane(origin=(4.5, 5, -4.593755734), x_dir=(-0.6756079062798056, 0, -0.7372611185816172), z_dir=(-0.7372611185816172, 0, 0.6756079062798056))) as chamfer1_piece_12_section:
        Polygon((3 + CHAMFER1_SIZE, 0), (3, -CHAMFER1_SIZE), (3, 0), align=None)
    chamfer1_piece_12 = revolve(axis=Axis((4.5, 5, -4.593755734), (0, -1, 0)), revolution_arc=132.501375425, mode=Mode.PRIVATE)
    chamfer1_piece_12 = chamfer1_piece_12 - Plane(origin=(9.5, 5, -8), x_dir=(-0.6557377049180538, 0, 0.7549887829291264), z_dir=(0, 1, 0)) * Cylinder(3.05, 21, mode=Mode.PRIVATE)
    chamfer1_piece_12 = split(chamfer1_piece_12, bisect_by=Plane(origin=(4.5, 5, -8.29), z_dir=(0, 0, 1)), keep=Keep.TOP, mode=Mode.PRIVATE)
    add(chamfer1_piece_12)

    # Fillet6
    fillet6_edges = [part.edges().sort_by_distance(p)[0] for p in [
        (6, 30, -6),
        (6, 30, 6),
        (-6, 30, 6),
        (-6, 30, -6),
    ]]
    fillet(fillet6_edges, radius=FILLET6_R)


solid = part.part
